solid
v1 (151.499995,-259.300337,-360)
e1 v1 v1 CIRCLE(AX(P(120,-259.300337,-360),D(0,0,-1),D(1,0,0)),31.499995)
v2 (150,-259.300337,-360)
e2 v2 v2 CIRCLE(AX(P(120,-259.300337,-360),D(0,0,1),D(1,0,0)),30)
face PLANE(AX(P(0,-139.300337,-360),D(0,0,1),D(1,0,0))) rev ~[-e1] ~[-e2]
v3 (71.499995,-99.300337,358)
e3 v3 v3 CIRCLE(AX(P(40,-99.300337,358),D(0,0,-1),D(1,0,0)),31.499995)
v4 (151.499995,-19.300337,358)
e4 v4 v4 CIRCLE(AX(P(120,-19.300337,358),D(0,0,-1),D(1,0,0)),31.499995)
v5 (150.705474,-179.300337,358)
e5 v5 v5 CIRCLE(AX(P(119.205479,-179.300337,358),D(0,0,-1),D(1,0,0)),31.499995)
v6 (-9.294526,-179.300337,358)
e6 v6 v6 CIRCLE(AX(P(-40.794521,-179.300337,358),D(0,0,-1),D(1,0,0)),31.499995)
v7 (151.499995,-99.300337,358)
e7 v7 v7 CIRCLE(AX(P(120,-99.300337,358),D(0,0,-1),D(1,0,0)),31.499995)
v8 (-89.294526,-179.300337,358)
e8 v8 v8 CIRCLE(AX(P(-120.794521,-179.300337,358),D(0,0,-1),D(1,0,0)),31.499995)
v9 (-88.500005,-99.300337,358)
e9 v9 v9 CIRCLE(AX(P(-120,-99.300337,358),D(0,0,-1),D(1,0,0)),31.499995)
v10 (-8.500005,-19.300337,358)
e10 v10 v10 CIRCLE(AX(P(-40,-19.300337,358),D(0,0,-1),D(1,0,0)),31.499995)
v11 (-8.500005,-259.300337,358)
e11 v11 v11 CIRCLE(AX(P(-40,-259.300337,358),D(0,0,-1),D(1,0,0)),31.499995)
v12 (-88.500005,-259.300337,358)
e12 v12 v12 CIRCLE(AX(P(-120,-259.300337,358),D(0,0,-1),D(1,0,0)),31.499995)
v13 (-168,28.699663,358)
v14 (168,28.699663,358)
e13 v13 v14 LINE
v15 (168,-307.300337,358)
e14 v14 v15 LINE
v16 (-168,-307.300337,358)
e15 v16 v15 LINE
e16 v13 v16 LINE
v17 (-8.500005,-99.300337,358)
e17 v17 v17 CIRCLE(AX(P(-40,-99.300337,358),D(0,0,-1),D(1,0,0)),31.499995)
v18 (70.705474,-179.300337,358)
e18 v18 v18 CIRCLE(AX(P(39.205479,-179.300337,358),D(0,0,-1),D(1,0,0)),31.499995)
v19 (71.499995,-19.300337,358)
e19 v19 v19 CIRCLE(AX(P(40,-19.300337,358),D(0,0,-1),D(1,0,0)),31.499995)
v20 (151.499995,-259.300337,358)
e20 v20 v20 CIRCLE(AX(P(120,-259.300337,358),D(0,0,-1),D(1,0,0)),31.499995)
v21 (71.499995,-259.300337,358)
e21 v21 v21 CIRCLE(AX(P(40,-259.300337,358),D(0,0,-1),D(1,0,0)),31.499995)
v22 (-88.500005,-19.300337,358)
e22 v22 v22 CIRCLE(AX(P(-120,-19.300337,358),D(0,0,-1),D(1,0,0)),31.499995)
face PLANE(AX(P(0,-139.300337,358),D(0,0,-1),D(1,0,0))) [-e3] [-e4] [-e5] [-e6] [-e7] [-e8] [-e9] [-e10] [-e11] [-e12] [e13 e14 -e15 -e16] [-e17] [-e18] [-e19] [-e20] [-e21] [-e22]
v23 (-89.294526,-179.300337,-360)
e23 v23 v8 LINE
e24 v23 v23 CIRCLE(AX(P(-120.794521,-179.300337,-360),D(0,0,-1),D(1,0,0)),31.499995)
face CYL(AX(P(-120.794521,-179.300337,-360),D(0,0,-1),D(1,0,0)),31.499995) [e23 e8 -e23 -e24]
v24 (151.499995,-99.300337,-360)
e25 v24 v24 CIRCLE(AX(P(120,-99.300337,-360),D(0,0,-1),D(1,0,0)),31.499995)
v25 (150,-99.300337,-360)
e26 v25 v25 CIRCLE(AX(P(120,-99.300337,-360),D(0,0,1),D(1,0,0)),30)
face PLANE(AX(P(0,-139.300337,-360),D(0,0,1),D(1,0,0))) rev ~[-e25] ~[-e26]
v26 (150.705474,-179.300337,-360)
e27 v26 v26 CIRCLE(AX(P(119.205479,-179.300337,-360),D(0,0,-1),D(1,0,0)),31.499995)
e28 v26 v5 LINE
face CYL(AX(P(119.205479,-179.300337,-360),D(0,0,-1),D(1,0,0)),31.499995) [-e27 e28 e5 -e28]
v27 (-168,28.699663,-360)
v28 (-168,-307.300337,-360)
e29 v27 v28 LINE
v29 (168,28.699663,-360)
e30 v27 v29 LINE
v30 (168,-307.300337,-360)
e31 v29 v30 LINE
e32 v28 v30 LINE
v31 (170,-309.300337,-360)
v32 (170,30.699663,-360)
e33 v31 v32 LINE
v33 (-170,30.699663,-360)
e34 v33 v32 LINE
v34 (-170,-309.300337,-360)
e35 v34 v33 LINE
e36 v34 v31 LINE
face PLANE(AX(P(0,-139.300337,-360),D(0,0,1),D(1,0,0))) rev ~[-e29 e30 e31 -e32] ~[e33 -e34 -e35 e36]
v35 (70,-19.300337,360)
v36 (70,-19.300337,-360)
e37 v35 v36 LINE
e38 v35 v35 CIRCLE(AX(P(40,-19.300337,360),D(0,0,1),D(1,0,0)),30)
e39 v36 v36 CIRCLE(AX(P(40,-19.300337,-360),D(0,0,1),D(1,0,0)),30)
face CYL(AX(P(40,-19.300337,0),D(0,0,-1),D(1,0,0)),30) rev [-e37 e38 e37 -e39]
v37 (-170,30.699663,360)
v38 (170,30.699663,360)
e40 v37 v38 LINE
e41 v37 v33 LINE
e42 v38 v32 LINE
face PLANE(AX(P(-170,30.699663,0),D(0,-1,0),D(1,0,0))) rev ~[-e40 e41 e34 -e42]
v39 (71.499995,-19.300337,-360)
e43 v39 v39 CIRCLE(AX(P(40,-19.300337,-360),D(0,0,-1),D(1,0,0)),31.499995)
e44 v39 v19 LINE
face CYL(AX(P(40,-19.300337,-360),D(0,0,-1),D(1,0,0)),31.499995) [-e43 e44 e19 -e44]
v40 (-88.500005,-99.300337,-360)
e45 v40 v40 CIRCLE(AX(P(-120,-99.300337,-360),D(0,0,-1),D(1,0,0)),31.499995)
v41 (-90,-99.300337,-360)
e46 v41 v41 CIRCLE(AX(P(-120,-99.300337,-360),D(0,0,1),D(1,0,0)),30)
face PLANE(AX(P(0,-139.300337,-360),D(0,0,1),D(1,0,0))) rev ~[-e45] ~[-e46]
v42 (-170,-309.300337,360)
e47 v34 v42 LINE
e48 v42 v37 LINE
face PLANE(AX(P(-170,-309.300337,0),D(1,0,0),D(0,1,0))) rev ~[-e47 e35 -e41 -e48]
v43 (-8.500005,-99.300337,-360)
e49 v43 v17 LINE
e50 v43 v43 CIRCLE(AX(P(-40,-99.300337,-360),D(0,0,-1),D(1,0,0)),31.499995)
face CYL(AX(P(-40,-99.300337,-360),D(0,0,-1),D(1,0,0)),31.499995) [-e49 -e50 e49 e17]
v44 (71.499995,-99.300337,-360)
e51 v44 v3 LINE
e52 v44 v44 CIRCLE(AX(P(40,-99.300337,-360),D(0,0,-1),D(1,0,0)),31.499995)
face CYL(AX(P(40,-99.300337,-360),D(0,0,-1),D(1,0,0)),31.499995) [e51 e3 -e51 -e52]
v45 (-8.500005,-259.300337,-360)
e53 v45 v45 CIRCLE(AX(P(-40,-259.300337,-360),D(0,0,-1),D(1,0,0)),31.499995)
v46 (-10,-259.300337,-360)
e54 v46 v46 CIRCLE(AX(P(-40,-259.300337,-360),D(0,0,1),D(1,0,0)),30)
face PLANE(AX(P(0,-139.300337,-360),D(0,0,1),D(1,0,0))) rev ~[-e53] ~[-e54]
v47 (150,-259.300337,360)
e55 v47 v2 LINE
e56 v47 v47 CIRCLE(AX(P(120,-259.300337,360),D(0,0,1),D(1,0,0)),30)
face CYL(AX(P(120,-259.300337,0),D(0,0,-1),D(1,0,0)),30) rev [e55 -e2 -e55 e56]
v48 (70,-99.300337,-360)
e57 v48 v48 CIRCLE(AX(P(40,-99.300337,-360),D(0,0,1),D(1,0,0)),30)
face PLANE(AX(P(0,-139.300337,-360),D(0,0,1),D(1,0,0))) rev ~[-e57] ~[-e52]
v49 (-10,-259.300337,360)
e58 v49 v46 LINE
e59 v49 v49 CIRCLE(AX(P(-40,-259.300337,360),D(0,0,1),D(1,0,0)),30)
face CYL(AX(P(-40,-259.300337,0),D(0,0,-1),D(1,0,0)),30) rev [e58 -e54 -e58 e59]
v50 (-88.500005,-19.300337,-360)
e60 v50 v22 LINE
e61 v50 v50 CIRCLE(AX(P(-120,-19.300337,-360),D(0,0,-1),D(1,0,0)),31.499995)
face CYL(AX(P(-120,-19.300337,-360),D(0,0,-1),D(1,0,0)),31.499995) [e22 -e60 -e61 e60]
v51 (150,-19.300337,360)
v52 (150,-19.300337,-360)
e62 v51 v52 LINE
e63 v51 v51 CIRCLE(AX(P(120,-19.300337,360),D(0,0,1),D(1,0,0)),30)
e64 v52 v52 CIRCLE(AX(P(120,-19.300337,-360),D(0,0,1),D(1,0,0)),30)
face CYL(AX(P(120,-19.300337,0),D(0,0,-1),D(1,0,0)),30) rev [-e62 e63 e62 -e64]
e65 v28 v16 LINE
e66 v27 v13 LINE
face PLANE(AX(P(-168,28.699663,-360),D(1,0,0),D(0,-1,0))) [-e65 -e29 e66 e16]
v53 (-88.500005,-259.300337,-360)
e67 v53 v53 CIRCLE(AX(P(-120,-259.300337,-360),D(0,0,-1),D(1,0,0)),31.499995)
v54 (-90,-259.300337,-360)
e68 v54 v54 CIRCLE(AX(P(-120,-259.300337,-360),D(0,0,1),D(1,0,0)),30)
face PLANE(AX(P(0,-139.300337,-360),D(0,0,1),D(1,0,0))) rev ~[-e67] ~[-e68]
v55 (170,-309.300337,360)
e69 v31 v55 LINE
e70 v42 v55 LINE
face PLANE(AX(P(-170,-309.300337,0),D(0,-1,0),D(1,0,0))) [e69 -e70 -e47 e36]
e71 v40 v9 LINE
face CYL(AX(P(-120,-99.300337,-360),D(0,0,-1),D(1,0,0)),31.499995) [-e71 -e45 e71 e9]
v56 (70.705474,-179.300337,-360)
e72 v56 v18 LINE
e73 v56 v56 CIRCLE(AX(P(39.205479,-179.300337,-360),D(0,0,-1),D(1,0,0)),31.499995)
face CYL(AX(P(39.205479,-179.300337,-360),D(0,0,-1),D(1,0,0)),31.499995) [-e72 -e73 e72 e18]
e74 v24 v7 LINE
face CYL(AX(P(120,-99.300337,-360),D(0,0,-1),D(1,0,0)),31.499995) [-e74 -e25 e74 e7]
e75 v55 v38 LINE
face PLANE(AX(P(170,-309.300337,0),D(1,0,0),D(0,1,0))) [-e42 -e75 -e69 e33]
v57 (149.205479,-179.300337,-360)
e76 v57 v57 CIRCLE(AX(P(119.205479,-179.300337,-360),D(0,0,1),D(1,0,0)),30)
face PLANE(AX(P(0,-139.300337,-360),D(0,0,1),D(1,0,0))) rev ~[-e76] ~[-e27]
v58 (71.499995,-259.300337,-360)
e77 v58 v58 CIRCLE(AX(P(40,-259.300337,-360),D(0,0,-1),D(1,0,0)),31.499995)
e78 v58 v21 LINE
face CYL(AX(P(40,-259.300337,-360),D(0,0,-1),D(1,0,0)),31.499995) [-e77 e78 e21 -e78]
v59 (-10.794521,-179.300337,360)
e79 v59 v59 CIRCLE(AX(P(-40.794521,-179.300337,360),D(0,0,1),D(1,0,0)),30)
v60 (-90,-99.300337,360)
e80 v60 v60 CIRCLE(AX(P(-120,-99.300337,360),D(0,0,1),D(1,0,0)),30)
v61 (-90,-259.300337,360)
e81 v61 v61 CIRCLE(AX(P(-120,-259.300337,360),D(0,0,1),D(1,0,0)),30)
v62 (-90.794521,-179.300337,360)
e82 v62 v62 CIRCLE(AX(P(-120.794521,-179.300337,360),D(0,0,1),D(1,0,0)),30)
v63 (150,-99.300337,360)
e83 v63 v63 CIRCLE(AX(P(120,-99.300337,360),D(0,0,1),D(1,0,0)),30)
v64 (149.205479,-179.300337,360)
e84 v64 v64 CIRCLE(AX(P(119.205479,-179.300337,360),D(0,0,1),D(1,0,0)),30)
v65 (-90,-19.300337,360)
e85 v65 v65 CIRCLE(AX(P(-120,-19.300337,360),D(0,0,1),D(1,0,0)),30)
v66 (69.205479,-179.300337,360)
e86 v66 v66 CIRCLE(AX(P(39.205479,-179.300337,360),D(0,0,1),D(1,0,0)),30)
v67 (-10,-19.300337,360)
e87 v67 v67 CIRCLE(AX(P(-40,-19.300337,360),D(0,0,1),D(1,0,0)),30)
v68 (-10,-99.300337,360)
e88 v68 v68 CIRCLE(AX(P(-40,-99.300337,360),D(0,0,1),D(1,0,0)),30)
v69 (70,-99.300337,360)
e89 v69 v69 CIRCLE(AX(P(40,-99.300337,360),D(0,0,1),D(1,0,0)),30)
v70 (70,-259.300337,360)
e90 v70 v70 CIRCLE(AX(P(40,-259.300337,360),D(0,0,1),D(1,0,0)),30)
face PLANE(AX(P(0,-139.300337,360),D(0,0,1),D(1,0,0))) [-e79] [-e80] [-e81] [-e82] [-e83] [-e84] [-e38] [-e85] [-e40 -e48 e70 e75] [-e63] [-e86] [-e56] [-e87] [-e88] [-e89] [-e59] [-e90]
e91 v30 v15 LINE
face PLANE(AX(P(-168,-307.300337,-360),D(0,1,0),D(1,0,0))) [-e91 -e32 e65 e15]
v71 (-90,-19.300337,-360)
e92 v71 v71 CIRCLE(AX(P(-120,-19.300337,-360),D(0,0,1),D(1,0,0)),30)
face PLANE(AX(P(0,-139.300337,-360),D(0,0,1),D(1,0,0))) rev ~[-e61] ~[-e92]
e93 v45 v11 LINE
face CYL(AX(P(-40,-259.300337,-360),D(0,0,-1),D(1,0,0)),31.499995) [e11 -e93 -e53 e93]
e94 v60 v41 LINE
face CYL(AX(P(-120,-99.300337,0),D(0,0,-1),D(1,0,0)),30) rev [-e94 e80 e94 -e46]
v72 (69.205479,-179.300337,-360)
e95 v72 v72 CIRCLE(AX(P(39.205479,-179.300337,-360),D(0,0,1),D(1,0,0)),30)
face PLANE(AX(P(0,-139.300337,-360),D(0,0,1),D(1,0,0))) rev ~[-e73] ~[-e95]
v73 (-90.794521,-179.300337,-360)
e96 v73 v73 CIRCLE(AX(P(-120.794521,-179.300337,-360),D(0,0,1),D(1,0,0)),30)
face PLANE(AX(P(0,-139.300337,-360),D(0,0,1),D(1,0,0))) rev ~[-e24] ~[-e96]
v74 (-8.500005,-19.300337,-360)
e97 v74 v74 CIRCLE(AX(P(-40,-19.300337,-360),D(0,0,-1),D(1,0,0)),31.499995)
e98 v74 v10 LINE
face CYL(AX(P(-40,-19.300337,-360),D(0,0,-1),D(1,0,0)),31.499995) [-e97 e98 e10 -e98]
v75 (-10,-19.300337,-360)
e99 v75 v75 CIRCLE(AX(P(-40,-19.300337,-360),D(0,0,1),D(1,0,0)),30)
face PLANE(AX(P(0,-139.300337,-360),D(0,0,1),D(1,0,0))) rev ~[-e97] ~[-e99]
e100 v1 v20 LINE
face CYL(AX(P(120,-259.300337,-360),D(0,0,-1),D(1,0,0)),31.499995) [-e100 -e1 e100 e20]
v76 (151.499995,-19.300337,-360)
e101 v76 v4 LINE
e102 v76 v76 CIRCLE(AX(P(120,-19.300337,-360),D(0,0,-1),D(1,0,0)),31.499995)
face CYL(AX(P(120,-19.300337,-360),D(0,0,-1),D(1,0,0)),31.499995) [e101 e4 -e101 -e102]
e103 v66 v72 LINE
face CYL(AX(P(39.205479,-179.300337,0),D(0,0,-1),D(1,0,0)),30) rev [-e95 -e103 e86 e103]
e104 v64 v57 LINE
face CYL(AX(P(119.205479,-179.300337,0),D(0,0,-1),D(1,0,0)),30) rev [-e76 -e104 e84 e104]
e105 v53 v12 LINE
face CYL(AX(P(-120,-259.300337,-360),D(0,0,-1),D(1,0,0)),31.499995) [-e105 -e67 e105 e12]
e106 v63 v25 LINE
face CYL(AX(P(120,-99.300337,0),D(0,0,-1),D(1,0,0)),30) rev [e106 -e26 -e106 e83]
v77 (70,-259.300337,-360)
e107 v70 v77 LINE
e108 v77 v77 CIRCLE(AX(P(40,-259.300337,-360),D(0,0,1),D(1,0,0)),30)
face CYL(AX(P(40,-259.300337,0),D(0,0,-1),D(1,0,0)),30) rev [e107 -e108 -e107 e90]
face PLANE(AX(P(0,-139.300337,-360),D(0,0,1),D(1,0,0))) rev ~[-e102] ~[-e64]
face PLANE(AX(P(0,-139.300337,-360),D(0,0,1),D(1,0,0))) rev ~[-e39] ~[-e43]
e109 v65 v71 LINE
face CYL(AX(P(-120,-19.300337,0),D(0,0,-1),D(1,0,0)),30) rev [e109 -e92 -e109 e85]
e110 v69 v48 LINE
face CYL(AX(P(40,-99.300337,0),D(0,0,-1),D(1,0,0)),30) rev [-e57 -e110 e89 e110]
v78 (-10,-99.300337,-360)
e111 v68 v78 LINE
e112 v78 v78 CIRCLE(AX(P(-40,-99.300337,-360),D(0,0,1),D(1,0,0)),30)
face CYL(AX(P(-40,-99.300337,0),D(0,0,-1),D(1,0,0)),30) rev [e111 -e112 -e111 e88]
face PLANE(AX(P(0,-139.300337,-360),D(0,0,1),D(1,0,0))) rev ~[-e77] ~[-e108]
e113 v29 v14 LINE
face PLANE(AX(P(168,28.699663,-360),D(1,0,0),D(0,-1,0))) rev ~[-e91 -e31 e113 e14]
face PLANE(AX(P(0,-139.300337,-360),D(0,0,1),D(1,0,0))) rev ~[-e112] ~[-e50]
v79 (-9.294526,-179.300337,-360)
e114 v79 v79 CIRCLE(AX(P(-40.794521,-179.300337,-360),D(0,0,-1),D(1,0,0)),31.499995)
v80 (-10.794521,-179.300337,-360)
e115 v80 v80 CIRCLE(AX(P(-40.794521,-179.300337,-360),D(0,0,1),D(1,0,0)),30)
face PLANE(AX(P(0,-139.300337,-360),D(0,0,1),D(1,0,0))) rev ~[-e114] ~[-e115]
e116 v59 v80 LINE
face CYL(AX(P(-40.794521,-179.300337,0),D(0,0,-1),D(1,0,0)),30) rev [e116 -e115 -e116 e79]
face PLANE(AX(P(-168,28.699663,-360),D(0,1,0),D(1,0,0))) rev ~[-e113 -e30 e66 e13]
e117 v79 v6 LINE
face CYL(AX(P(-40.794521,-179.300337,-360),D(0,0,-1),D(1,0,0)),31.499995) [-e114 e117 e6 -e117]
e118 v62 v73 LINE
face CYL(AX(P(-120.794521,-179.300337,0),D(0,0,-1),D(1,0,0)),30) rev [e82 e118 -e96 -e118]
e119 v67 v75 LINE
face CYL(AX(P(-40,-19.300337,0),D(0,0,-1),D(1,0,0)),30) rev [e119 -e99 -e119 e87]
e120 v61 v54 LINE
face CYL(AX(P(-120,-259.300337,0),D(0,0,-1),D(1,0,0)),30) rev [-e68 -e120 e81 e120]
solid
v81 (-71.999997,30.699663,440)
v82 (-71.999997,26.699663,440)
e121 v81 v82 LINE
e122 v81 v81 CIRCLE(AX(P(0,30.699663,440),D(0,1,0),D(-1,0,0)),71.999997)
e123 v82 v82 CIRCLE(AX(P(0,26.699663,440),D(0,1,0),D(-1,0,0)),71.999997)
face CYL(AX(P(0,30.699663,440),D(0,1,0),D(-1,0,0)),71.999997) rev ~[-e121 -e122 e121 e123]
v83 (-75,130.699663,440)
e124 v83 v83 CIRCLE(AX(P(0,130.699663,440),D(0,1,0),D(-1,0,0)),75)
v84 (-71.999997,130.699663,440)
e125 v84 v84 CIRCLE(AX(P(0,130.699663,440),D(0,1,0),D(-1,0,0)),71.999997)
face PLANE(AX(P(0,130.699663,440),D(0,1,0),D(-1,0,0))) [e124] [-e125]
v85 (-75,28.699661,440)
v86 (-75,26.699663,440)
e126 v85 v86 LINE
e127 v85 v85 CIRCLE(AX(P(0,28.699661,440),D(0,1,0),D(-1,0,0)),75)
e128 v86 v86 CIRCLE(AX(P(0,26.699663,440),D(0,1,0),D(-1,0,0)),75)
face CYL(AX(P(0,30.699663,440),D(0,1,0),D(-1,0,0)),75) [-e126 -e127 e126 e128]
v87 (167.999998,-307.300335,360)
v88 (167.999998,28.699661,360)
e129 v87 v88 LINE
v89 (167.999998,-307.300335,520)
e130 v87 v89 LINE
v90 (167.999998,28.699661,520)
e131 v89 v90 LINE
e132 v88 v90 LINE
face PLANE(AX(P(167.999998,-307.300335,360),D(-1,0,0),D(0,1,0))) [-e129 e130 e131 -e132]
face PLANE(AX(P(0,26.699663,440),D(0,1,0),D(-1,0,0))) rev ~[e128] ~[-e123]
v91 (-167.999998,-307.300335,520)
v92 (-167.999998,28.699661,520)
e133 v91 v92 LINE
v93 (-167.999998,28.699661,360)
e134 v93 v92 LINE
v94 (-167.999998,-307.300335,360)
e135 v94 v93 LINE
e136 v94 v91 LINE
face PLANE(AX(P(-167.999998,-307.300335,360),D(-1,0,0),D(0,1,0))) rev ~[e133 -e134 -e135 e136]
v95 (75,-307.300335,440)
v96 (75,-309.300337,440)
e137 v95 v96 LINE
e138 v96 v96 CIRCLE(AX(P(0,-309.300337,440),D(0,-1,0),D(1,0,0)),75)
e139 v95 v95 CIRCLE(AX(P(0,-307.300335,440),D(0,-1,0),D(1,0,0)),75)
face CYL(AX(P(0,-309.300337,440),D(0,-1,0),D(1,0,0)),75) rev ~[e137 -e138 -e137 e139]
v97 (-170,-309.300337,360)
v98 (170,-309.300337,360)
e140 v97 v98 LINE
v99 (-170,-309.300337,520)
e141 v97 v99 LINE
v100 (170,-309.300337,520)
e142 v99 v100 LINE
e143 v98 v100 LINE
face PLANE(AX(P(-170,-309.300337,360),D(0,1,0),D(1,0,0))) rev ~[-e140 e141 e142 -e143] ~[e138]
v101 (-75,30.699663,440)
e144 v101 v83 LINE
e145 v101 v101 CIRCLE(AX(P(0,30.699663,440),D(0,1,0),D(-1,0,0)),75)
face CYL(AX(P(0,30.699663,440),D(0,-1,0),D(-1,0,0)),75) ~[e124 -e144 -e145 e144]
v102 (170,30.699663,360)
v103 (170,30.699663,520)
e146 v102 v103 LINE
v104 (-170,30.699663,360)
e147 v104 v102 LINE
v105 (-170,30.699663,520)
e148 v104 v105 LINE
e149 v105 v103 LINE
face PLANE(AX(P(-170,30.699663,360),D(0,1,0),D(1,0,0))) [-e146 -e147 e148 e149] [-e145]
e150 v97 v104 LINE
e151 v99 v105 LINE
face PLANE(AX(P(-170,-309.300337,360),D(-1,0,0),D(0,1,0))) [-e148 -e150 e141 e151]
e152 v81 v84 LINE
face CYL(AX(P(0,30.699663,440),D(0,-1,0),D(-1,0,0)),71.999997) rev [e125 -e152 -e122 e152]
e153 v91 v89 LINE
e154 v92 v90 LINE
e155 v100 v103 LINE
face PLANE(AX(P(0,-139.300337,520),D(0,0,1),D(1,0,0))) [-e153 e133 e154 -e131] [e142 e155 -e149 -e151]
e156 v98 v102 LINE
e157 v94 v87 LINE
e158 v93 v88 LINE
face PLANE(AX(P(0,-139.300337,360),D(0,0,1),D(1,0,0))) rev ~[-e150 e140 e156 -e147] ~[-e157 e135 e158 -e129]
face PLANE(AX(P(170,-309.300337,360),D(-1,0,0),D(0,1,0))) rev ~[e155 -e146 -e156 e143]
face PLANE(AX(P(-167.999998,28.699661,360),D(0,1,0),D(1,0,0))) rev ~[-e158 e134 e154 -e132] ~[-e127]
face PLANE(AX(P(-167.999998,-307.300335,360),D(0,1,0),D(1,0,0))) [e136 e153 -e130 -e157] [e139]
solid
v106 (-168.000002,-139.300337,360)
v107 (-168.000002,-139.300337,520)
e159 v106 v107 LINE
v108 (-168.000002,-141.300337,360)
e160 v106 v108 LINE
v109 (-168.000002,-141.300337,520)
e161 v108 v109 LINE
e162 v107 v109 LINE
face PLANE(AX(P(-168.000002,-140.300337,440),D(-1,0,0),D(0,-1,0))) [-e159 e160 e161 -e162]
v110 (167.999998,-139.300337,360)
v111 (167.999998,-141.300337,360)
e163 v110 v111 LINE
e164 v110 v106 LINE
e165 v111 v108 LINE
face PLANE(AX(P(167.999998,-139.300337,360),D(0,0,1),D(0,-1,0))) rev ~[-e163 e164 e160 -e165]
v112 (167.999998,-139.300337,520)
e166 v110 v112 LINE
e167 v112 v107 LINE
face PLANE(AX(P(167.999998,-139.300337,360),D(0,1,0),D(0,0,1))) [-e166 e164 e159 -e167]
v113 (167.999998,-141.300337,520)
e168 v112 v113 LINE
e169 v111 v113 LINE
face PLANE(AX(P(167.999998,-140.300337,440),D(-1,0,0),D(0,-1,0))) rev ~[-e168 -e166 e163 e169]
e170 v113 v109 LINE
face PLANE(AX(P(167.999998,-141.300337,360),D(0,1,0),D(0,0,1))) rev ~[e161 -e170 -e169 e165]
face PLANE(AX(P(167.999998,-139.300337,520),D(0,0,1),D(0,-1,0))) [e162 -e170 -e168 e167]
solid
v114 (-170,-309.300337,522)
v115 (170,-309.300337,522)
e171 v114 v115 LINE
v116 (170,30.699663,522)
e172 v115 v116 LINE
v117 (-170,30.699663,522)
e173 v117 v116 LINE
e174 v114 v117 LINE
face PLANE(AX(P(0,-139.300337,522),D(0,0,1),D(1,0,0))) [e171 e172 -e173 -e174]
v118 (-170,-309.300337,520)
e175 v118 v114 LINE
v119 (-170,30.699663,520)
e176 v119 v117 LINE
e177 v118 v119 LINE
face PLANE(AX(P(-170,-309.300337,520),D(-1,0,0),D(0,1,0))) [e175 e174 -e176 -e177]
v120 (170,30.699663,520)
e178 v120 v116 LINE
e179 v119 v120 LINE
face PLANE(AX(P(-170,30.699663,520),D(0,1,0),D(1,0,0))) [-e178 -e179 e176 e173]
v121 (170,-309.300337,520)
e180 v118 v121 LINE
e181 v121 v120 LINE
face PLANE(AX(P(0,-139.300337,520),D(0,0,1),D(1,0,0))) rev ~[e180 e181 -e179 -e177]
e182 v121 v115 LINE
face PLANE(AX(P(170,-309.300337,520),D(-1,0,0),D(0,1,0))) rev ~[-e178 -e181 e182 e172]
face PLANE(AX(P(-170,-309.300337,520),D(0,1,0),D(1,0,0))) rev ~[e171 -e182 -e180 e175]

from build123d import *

# Parameters (mm, degrees)
F0_W           = 340
F0_H           = 340
F0_R           = 30
F1_DEPTH       = 360
F2_W           = 340
F2_H           = 340
F2_W_2         = 335.99999547
F2_H_2         = 335.99999547
F3_DEPTH       = 160
F4_W           = 2
F4_H           = 160
F5_DEPTH       = 336
F6_W           = 340
F6_H           = 340
F7_DEPTH       = 2
F8_R           = 75
F9_DEPTH       = 12.5
F12_R          = 75
F13_DEPTH      = 25
F14_R          = 75
F14_R_2        = 71.9999969006
F15_DEPTH      = 100
F15_DEPTH_BACK = 4
F16_W          = 336
F16_H          = 336
F16_R          = 31.4999952912
F17_DEPTH      = 718


# Not quite as in the source:
# - the program builds the solid bodies; features that only make, move or delete a surface that nothing else refers to are left out


with BuildPart() as f1:
    # F0 (on Top) → F1 (new body, symmetric)
    with BuildSketch(Plane.XY):
        with Locations((0, -139.3003371358)):
            Rectangle(F0_W, F0_H)
        with Locations((-120, -259.3003371358)):
            Circle(F0_R, mode=Mode.SUBTRACT)
        with Locations((-40, -259.3003371358)):
            Circle(F0_R, mode=Mode.SUBTRACT)
        with Locations((-120.7945212722, -179.3003371358)):
            Circle(F0_R, mode=Mode.SUBTRACT)
        with Locations((-40.7945212722, -179.3003371358)):
            Circle(F0_R, mode=Mode.SUBTRACT)
        with Locations((40, -259.3003371358)):
            Circle(F0_R, mode=Mode.SUBTRACT)
        with Locations((120, -259.3003371358)):
            Circle(F0_R, mode=Mode.SUBTRACT)
        with Locations((39.2054787278, -179.3003371358)):
            Circle(F0_R, mode=Mode.SUBTRACT)
        with Locations((119.2054787278, -179.3003371358)):
            Circle(F0_R, mode=Mode.SUBTRACT)
        with Locations((-120, -99.3003371358)):
            Circle(F0_R, mode=Mode.SUBTRACT)
        with Locations((-40, -99.3003371358)):
            Circle(F0_R, mode=Mode.SUBTRACT)
        with Locations((-120, -19.3003371358)):
            Circle(F0_R, mode=Mode.SUBTRACT)
        with Locations((-40, -19.3003371358)):
            Circle(F0_R, mode=Mode.SUBTRACT)
        with Locations((40, -99.3003371358)):
            Circle(F0_R, mode=Mode.SUBTRACT)
        with Locations((120, -99.3003371358)):
            Circle(F0_R, mode=Mode.SUBTRACT)
        with Locations((40, -19.3003371358)):
            Circle(F0_R, mode=Mode.SUBTRACT)
        with Locations((120, -19.3003371358)):
            Circle(F0_R, mode=Mode.SUBTRACT)
    extrude(amount=F1_DEPTH, both=True)

    # F16 (on face) → F17 (cut)
    with BuildSketch(Plane(origin=(0, 0, -360), x_dir=(1, 0, 0), z_dir=(0, 0, -1))):
        with Locations((0, 139.3003371358)):
            Rectangle(F16_W, F16_H)
        with Locations((-120, 19.3003371358)):
            Circle(F16_R, mode=Mode.SUBTRACT)
        with Locations((-40, 19.3003371358)):
            Circle(F16_R, mode=Mode.SUBTRACT)
        with Locations((-120, 99.3003371358)):
            Circle(F16_R, mode=Mode.SUBTRACT)
        with Locations((-40, 99.3003371358)):
            Circle(F16_R, mode=Mode.SUBTRACT)
        with Locations((40, 19.3003371358)):
            Circle(F16_R, mode=Mode.SUBTRACT)
        with Locations((120, 19.3003371358)):
            Circle(F16_R, mode=Mode.SUBTRACT)
        with Locations((40, 99.3003371358)):
            Circle(F16_R, mode=Mode.SUBTRACT)
        with Locations((120, 99.3003371358)):
            Circle(F16_R, mode=Mode.SUBTRACT)
        with Locations((-120.7945212722, 179.3003371358)):
            Circle(F16_R, mode=Mode.SUBTRACT)
        with Locations((-40.7945212722, 179.3003371358)):
            Circle(F16_R, mode=Mode.SUBTRACT)
        with Locations((-120, 259.3003371358)):
            Circle(F16_R, mode=Mode.SUBTRACT)
        with Locations((-40, 259.3003371358)):
            Circle(F16_R, mode=Mode.SUBTRACT)
        with Locations((39.2054787278, 179.3003371358)):
            Circle(F16_R, mode=Mode.SUBTRACT)
        with Locations((119.2054787278, 179.3003371358)):
            Circle(F16_R, mode=Mode.SUBTRACT)
        with Locations((40, 259.3003371358)):
            Circle(F16_R, mode=Mode.SUBTRACT)
        with Locations((120, 259.3003371358)):
            Circle(F16_R, mode=Mode.SUBTRACT)
    extrude(amount=-F17_DEPTH, mode=Mode.SUBTRACT)


with BuildPart() as f3:
    # F2 (on face) → F3 (new body)
    with BuildSketch(Plane.XY.offset(360)):
        with Locations((0, -139.3003371358)):
            Rectangle(F2_W, F2_H)
        with Locations((0, -139.3003371358)):
            Rectangle(F2_W_2, F2_H_2, mode=Mode.SUBTRACT)
    extrude(amount=F3_DEPTH)

    # F8 (on face) → F9 (cut, symmetric)
    with BuildSketch(Plane.XZ.offset(309.3003371358)):
        with Locations((0, 440)):
            Circle(F8_R)
    extrude(amount=F9_DEPTH, both=True, mode=Mode.SUBTRACT)

    # F12 (on face) → F13 (cut)
    with BuildSketch(Plane(origin=(0, 30.6996628642, 0), x_dir=(-1, 0, 0), z_dir=(0, 1, 0))):
        with Locations((0, 440)):
            Circle(F12_R)
    extrude(amount=-F13_DEPTH, mode=Mode.SUBTRACT)

    # F14 (on face) → F15 (join, two sides)
    with BuildSketch(Plane(origin=(0, 30.6996628642, 0), x_dir=(-1, 0, 0), z_dir=(0, 1, 0))) as f15_sk:
        with Locations((0, 440)):
            Circle(F14_R)
        with Locations((0, 440)):
            Circle(F14_R_2, mode=Mode.SUBTRACT)
    extrude(amount=F15_DEPTH)
    extrude(f15_sk.sketch, amount=-F15_DEPTH_BACK)


with BuildPart() as f5:
    # F4 (on face) → F5 (new body)
    with BuildSketch(Plane(origin=(167.999997735, 0, 0), x_dir=(0, -1, 0), z_dir=(-1, 0, 0))):
        with Locations((140.3003371358, 440)):
            Rectangle(F4_W, F4_H)
    extrude(amount=F5_DEPTH)


with BuildPart() as f7:
    # F6 (on face) → F7 (new body)
    with BuildSketch(Plane.XY.offset(520)):
        with Locations((0, -139.3003371358)):
            Rectangle(F6_W, F6_H)
    extrude(amount=F7_DEPTH)


solid = Compound([f1.part, f3.part, f5.part, f7.part])
